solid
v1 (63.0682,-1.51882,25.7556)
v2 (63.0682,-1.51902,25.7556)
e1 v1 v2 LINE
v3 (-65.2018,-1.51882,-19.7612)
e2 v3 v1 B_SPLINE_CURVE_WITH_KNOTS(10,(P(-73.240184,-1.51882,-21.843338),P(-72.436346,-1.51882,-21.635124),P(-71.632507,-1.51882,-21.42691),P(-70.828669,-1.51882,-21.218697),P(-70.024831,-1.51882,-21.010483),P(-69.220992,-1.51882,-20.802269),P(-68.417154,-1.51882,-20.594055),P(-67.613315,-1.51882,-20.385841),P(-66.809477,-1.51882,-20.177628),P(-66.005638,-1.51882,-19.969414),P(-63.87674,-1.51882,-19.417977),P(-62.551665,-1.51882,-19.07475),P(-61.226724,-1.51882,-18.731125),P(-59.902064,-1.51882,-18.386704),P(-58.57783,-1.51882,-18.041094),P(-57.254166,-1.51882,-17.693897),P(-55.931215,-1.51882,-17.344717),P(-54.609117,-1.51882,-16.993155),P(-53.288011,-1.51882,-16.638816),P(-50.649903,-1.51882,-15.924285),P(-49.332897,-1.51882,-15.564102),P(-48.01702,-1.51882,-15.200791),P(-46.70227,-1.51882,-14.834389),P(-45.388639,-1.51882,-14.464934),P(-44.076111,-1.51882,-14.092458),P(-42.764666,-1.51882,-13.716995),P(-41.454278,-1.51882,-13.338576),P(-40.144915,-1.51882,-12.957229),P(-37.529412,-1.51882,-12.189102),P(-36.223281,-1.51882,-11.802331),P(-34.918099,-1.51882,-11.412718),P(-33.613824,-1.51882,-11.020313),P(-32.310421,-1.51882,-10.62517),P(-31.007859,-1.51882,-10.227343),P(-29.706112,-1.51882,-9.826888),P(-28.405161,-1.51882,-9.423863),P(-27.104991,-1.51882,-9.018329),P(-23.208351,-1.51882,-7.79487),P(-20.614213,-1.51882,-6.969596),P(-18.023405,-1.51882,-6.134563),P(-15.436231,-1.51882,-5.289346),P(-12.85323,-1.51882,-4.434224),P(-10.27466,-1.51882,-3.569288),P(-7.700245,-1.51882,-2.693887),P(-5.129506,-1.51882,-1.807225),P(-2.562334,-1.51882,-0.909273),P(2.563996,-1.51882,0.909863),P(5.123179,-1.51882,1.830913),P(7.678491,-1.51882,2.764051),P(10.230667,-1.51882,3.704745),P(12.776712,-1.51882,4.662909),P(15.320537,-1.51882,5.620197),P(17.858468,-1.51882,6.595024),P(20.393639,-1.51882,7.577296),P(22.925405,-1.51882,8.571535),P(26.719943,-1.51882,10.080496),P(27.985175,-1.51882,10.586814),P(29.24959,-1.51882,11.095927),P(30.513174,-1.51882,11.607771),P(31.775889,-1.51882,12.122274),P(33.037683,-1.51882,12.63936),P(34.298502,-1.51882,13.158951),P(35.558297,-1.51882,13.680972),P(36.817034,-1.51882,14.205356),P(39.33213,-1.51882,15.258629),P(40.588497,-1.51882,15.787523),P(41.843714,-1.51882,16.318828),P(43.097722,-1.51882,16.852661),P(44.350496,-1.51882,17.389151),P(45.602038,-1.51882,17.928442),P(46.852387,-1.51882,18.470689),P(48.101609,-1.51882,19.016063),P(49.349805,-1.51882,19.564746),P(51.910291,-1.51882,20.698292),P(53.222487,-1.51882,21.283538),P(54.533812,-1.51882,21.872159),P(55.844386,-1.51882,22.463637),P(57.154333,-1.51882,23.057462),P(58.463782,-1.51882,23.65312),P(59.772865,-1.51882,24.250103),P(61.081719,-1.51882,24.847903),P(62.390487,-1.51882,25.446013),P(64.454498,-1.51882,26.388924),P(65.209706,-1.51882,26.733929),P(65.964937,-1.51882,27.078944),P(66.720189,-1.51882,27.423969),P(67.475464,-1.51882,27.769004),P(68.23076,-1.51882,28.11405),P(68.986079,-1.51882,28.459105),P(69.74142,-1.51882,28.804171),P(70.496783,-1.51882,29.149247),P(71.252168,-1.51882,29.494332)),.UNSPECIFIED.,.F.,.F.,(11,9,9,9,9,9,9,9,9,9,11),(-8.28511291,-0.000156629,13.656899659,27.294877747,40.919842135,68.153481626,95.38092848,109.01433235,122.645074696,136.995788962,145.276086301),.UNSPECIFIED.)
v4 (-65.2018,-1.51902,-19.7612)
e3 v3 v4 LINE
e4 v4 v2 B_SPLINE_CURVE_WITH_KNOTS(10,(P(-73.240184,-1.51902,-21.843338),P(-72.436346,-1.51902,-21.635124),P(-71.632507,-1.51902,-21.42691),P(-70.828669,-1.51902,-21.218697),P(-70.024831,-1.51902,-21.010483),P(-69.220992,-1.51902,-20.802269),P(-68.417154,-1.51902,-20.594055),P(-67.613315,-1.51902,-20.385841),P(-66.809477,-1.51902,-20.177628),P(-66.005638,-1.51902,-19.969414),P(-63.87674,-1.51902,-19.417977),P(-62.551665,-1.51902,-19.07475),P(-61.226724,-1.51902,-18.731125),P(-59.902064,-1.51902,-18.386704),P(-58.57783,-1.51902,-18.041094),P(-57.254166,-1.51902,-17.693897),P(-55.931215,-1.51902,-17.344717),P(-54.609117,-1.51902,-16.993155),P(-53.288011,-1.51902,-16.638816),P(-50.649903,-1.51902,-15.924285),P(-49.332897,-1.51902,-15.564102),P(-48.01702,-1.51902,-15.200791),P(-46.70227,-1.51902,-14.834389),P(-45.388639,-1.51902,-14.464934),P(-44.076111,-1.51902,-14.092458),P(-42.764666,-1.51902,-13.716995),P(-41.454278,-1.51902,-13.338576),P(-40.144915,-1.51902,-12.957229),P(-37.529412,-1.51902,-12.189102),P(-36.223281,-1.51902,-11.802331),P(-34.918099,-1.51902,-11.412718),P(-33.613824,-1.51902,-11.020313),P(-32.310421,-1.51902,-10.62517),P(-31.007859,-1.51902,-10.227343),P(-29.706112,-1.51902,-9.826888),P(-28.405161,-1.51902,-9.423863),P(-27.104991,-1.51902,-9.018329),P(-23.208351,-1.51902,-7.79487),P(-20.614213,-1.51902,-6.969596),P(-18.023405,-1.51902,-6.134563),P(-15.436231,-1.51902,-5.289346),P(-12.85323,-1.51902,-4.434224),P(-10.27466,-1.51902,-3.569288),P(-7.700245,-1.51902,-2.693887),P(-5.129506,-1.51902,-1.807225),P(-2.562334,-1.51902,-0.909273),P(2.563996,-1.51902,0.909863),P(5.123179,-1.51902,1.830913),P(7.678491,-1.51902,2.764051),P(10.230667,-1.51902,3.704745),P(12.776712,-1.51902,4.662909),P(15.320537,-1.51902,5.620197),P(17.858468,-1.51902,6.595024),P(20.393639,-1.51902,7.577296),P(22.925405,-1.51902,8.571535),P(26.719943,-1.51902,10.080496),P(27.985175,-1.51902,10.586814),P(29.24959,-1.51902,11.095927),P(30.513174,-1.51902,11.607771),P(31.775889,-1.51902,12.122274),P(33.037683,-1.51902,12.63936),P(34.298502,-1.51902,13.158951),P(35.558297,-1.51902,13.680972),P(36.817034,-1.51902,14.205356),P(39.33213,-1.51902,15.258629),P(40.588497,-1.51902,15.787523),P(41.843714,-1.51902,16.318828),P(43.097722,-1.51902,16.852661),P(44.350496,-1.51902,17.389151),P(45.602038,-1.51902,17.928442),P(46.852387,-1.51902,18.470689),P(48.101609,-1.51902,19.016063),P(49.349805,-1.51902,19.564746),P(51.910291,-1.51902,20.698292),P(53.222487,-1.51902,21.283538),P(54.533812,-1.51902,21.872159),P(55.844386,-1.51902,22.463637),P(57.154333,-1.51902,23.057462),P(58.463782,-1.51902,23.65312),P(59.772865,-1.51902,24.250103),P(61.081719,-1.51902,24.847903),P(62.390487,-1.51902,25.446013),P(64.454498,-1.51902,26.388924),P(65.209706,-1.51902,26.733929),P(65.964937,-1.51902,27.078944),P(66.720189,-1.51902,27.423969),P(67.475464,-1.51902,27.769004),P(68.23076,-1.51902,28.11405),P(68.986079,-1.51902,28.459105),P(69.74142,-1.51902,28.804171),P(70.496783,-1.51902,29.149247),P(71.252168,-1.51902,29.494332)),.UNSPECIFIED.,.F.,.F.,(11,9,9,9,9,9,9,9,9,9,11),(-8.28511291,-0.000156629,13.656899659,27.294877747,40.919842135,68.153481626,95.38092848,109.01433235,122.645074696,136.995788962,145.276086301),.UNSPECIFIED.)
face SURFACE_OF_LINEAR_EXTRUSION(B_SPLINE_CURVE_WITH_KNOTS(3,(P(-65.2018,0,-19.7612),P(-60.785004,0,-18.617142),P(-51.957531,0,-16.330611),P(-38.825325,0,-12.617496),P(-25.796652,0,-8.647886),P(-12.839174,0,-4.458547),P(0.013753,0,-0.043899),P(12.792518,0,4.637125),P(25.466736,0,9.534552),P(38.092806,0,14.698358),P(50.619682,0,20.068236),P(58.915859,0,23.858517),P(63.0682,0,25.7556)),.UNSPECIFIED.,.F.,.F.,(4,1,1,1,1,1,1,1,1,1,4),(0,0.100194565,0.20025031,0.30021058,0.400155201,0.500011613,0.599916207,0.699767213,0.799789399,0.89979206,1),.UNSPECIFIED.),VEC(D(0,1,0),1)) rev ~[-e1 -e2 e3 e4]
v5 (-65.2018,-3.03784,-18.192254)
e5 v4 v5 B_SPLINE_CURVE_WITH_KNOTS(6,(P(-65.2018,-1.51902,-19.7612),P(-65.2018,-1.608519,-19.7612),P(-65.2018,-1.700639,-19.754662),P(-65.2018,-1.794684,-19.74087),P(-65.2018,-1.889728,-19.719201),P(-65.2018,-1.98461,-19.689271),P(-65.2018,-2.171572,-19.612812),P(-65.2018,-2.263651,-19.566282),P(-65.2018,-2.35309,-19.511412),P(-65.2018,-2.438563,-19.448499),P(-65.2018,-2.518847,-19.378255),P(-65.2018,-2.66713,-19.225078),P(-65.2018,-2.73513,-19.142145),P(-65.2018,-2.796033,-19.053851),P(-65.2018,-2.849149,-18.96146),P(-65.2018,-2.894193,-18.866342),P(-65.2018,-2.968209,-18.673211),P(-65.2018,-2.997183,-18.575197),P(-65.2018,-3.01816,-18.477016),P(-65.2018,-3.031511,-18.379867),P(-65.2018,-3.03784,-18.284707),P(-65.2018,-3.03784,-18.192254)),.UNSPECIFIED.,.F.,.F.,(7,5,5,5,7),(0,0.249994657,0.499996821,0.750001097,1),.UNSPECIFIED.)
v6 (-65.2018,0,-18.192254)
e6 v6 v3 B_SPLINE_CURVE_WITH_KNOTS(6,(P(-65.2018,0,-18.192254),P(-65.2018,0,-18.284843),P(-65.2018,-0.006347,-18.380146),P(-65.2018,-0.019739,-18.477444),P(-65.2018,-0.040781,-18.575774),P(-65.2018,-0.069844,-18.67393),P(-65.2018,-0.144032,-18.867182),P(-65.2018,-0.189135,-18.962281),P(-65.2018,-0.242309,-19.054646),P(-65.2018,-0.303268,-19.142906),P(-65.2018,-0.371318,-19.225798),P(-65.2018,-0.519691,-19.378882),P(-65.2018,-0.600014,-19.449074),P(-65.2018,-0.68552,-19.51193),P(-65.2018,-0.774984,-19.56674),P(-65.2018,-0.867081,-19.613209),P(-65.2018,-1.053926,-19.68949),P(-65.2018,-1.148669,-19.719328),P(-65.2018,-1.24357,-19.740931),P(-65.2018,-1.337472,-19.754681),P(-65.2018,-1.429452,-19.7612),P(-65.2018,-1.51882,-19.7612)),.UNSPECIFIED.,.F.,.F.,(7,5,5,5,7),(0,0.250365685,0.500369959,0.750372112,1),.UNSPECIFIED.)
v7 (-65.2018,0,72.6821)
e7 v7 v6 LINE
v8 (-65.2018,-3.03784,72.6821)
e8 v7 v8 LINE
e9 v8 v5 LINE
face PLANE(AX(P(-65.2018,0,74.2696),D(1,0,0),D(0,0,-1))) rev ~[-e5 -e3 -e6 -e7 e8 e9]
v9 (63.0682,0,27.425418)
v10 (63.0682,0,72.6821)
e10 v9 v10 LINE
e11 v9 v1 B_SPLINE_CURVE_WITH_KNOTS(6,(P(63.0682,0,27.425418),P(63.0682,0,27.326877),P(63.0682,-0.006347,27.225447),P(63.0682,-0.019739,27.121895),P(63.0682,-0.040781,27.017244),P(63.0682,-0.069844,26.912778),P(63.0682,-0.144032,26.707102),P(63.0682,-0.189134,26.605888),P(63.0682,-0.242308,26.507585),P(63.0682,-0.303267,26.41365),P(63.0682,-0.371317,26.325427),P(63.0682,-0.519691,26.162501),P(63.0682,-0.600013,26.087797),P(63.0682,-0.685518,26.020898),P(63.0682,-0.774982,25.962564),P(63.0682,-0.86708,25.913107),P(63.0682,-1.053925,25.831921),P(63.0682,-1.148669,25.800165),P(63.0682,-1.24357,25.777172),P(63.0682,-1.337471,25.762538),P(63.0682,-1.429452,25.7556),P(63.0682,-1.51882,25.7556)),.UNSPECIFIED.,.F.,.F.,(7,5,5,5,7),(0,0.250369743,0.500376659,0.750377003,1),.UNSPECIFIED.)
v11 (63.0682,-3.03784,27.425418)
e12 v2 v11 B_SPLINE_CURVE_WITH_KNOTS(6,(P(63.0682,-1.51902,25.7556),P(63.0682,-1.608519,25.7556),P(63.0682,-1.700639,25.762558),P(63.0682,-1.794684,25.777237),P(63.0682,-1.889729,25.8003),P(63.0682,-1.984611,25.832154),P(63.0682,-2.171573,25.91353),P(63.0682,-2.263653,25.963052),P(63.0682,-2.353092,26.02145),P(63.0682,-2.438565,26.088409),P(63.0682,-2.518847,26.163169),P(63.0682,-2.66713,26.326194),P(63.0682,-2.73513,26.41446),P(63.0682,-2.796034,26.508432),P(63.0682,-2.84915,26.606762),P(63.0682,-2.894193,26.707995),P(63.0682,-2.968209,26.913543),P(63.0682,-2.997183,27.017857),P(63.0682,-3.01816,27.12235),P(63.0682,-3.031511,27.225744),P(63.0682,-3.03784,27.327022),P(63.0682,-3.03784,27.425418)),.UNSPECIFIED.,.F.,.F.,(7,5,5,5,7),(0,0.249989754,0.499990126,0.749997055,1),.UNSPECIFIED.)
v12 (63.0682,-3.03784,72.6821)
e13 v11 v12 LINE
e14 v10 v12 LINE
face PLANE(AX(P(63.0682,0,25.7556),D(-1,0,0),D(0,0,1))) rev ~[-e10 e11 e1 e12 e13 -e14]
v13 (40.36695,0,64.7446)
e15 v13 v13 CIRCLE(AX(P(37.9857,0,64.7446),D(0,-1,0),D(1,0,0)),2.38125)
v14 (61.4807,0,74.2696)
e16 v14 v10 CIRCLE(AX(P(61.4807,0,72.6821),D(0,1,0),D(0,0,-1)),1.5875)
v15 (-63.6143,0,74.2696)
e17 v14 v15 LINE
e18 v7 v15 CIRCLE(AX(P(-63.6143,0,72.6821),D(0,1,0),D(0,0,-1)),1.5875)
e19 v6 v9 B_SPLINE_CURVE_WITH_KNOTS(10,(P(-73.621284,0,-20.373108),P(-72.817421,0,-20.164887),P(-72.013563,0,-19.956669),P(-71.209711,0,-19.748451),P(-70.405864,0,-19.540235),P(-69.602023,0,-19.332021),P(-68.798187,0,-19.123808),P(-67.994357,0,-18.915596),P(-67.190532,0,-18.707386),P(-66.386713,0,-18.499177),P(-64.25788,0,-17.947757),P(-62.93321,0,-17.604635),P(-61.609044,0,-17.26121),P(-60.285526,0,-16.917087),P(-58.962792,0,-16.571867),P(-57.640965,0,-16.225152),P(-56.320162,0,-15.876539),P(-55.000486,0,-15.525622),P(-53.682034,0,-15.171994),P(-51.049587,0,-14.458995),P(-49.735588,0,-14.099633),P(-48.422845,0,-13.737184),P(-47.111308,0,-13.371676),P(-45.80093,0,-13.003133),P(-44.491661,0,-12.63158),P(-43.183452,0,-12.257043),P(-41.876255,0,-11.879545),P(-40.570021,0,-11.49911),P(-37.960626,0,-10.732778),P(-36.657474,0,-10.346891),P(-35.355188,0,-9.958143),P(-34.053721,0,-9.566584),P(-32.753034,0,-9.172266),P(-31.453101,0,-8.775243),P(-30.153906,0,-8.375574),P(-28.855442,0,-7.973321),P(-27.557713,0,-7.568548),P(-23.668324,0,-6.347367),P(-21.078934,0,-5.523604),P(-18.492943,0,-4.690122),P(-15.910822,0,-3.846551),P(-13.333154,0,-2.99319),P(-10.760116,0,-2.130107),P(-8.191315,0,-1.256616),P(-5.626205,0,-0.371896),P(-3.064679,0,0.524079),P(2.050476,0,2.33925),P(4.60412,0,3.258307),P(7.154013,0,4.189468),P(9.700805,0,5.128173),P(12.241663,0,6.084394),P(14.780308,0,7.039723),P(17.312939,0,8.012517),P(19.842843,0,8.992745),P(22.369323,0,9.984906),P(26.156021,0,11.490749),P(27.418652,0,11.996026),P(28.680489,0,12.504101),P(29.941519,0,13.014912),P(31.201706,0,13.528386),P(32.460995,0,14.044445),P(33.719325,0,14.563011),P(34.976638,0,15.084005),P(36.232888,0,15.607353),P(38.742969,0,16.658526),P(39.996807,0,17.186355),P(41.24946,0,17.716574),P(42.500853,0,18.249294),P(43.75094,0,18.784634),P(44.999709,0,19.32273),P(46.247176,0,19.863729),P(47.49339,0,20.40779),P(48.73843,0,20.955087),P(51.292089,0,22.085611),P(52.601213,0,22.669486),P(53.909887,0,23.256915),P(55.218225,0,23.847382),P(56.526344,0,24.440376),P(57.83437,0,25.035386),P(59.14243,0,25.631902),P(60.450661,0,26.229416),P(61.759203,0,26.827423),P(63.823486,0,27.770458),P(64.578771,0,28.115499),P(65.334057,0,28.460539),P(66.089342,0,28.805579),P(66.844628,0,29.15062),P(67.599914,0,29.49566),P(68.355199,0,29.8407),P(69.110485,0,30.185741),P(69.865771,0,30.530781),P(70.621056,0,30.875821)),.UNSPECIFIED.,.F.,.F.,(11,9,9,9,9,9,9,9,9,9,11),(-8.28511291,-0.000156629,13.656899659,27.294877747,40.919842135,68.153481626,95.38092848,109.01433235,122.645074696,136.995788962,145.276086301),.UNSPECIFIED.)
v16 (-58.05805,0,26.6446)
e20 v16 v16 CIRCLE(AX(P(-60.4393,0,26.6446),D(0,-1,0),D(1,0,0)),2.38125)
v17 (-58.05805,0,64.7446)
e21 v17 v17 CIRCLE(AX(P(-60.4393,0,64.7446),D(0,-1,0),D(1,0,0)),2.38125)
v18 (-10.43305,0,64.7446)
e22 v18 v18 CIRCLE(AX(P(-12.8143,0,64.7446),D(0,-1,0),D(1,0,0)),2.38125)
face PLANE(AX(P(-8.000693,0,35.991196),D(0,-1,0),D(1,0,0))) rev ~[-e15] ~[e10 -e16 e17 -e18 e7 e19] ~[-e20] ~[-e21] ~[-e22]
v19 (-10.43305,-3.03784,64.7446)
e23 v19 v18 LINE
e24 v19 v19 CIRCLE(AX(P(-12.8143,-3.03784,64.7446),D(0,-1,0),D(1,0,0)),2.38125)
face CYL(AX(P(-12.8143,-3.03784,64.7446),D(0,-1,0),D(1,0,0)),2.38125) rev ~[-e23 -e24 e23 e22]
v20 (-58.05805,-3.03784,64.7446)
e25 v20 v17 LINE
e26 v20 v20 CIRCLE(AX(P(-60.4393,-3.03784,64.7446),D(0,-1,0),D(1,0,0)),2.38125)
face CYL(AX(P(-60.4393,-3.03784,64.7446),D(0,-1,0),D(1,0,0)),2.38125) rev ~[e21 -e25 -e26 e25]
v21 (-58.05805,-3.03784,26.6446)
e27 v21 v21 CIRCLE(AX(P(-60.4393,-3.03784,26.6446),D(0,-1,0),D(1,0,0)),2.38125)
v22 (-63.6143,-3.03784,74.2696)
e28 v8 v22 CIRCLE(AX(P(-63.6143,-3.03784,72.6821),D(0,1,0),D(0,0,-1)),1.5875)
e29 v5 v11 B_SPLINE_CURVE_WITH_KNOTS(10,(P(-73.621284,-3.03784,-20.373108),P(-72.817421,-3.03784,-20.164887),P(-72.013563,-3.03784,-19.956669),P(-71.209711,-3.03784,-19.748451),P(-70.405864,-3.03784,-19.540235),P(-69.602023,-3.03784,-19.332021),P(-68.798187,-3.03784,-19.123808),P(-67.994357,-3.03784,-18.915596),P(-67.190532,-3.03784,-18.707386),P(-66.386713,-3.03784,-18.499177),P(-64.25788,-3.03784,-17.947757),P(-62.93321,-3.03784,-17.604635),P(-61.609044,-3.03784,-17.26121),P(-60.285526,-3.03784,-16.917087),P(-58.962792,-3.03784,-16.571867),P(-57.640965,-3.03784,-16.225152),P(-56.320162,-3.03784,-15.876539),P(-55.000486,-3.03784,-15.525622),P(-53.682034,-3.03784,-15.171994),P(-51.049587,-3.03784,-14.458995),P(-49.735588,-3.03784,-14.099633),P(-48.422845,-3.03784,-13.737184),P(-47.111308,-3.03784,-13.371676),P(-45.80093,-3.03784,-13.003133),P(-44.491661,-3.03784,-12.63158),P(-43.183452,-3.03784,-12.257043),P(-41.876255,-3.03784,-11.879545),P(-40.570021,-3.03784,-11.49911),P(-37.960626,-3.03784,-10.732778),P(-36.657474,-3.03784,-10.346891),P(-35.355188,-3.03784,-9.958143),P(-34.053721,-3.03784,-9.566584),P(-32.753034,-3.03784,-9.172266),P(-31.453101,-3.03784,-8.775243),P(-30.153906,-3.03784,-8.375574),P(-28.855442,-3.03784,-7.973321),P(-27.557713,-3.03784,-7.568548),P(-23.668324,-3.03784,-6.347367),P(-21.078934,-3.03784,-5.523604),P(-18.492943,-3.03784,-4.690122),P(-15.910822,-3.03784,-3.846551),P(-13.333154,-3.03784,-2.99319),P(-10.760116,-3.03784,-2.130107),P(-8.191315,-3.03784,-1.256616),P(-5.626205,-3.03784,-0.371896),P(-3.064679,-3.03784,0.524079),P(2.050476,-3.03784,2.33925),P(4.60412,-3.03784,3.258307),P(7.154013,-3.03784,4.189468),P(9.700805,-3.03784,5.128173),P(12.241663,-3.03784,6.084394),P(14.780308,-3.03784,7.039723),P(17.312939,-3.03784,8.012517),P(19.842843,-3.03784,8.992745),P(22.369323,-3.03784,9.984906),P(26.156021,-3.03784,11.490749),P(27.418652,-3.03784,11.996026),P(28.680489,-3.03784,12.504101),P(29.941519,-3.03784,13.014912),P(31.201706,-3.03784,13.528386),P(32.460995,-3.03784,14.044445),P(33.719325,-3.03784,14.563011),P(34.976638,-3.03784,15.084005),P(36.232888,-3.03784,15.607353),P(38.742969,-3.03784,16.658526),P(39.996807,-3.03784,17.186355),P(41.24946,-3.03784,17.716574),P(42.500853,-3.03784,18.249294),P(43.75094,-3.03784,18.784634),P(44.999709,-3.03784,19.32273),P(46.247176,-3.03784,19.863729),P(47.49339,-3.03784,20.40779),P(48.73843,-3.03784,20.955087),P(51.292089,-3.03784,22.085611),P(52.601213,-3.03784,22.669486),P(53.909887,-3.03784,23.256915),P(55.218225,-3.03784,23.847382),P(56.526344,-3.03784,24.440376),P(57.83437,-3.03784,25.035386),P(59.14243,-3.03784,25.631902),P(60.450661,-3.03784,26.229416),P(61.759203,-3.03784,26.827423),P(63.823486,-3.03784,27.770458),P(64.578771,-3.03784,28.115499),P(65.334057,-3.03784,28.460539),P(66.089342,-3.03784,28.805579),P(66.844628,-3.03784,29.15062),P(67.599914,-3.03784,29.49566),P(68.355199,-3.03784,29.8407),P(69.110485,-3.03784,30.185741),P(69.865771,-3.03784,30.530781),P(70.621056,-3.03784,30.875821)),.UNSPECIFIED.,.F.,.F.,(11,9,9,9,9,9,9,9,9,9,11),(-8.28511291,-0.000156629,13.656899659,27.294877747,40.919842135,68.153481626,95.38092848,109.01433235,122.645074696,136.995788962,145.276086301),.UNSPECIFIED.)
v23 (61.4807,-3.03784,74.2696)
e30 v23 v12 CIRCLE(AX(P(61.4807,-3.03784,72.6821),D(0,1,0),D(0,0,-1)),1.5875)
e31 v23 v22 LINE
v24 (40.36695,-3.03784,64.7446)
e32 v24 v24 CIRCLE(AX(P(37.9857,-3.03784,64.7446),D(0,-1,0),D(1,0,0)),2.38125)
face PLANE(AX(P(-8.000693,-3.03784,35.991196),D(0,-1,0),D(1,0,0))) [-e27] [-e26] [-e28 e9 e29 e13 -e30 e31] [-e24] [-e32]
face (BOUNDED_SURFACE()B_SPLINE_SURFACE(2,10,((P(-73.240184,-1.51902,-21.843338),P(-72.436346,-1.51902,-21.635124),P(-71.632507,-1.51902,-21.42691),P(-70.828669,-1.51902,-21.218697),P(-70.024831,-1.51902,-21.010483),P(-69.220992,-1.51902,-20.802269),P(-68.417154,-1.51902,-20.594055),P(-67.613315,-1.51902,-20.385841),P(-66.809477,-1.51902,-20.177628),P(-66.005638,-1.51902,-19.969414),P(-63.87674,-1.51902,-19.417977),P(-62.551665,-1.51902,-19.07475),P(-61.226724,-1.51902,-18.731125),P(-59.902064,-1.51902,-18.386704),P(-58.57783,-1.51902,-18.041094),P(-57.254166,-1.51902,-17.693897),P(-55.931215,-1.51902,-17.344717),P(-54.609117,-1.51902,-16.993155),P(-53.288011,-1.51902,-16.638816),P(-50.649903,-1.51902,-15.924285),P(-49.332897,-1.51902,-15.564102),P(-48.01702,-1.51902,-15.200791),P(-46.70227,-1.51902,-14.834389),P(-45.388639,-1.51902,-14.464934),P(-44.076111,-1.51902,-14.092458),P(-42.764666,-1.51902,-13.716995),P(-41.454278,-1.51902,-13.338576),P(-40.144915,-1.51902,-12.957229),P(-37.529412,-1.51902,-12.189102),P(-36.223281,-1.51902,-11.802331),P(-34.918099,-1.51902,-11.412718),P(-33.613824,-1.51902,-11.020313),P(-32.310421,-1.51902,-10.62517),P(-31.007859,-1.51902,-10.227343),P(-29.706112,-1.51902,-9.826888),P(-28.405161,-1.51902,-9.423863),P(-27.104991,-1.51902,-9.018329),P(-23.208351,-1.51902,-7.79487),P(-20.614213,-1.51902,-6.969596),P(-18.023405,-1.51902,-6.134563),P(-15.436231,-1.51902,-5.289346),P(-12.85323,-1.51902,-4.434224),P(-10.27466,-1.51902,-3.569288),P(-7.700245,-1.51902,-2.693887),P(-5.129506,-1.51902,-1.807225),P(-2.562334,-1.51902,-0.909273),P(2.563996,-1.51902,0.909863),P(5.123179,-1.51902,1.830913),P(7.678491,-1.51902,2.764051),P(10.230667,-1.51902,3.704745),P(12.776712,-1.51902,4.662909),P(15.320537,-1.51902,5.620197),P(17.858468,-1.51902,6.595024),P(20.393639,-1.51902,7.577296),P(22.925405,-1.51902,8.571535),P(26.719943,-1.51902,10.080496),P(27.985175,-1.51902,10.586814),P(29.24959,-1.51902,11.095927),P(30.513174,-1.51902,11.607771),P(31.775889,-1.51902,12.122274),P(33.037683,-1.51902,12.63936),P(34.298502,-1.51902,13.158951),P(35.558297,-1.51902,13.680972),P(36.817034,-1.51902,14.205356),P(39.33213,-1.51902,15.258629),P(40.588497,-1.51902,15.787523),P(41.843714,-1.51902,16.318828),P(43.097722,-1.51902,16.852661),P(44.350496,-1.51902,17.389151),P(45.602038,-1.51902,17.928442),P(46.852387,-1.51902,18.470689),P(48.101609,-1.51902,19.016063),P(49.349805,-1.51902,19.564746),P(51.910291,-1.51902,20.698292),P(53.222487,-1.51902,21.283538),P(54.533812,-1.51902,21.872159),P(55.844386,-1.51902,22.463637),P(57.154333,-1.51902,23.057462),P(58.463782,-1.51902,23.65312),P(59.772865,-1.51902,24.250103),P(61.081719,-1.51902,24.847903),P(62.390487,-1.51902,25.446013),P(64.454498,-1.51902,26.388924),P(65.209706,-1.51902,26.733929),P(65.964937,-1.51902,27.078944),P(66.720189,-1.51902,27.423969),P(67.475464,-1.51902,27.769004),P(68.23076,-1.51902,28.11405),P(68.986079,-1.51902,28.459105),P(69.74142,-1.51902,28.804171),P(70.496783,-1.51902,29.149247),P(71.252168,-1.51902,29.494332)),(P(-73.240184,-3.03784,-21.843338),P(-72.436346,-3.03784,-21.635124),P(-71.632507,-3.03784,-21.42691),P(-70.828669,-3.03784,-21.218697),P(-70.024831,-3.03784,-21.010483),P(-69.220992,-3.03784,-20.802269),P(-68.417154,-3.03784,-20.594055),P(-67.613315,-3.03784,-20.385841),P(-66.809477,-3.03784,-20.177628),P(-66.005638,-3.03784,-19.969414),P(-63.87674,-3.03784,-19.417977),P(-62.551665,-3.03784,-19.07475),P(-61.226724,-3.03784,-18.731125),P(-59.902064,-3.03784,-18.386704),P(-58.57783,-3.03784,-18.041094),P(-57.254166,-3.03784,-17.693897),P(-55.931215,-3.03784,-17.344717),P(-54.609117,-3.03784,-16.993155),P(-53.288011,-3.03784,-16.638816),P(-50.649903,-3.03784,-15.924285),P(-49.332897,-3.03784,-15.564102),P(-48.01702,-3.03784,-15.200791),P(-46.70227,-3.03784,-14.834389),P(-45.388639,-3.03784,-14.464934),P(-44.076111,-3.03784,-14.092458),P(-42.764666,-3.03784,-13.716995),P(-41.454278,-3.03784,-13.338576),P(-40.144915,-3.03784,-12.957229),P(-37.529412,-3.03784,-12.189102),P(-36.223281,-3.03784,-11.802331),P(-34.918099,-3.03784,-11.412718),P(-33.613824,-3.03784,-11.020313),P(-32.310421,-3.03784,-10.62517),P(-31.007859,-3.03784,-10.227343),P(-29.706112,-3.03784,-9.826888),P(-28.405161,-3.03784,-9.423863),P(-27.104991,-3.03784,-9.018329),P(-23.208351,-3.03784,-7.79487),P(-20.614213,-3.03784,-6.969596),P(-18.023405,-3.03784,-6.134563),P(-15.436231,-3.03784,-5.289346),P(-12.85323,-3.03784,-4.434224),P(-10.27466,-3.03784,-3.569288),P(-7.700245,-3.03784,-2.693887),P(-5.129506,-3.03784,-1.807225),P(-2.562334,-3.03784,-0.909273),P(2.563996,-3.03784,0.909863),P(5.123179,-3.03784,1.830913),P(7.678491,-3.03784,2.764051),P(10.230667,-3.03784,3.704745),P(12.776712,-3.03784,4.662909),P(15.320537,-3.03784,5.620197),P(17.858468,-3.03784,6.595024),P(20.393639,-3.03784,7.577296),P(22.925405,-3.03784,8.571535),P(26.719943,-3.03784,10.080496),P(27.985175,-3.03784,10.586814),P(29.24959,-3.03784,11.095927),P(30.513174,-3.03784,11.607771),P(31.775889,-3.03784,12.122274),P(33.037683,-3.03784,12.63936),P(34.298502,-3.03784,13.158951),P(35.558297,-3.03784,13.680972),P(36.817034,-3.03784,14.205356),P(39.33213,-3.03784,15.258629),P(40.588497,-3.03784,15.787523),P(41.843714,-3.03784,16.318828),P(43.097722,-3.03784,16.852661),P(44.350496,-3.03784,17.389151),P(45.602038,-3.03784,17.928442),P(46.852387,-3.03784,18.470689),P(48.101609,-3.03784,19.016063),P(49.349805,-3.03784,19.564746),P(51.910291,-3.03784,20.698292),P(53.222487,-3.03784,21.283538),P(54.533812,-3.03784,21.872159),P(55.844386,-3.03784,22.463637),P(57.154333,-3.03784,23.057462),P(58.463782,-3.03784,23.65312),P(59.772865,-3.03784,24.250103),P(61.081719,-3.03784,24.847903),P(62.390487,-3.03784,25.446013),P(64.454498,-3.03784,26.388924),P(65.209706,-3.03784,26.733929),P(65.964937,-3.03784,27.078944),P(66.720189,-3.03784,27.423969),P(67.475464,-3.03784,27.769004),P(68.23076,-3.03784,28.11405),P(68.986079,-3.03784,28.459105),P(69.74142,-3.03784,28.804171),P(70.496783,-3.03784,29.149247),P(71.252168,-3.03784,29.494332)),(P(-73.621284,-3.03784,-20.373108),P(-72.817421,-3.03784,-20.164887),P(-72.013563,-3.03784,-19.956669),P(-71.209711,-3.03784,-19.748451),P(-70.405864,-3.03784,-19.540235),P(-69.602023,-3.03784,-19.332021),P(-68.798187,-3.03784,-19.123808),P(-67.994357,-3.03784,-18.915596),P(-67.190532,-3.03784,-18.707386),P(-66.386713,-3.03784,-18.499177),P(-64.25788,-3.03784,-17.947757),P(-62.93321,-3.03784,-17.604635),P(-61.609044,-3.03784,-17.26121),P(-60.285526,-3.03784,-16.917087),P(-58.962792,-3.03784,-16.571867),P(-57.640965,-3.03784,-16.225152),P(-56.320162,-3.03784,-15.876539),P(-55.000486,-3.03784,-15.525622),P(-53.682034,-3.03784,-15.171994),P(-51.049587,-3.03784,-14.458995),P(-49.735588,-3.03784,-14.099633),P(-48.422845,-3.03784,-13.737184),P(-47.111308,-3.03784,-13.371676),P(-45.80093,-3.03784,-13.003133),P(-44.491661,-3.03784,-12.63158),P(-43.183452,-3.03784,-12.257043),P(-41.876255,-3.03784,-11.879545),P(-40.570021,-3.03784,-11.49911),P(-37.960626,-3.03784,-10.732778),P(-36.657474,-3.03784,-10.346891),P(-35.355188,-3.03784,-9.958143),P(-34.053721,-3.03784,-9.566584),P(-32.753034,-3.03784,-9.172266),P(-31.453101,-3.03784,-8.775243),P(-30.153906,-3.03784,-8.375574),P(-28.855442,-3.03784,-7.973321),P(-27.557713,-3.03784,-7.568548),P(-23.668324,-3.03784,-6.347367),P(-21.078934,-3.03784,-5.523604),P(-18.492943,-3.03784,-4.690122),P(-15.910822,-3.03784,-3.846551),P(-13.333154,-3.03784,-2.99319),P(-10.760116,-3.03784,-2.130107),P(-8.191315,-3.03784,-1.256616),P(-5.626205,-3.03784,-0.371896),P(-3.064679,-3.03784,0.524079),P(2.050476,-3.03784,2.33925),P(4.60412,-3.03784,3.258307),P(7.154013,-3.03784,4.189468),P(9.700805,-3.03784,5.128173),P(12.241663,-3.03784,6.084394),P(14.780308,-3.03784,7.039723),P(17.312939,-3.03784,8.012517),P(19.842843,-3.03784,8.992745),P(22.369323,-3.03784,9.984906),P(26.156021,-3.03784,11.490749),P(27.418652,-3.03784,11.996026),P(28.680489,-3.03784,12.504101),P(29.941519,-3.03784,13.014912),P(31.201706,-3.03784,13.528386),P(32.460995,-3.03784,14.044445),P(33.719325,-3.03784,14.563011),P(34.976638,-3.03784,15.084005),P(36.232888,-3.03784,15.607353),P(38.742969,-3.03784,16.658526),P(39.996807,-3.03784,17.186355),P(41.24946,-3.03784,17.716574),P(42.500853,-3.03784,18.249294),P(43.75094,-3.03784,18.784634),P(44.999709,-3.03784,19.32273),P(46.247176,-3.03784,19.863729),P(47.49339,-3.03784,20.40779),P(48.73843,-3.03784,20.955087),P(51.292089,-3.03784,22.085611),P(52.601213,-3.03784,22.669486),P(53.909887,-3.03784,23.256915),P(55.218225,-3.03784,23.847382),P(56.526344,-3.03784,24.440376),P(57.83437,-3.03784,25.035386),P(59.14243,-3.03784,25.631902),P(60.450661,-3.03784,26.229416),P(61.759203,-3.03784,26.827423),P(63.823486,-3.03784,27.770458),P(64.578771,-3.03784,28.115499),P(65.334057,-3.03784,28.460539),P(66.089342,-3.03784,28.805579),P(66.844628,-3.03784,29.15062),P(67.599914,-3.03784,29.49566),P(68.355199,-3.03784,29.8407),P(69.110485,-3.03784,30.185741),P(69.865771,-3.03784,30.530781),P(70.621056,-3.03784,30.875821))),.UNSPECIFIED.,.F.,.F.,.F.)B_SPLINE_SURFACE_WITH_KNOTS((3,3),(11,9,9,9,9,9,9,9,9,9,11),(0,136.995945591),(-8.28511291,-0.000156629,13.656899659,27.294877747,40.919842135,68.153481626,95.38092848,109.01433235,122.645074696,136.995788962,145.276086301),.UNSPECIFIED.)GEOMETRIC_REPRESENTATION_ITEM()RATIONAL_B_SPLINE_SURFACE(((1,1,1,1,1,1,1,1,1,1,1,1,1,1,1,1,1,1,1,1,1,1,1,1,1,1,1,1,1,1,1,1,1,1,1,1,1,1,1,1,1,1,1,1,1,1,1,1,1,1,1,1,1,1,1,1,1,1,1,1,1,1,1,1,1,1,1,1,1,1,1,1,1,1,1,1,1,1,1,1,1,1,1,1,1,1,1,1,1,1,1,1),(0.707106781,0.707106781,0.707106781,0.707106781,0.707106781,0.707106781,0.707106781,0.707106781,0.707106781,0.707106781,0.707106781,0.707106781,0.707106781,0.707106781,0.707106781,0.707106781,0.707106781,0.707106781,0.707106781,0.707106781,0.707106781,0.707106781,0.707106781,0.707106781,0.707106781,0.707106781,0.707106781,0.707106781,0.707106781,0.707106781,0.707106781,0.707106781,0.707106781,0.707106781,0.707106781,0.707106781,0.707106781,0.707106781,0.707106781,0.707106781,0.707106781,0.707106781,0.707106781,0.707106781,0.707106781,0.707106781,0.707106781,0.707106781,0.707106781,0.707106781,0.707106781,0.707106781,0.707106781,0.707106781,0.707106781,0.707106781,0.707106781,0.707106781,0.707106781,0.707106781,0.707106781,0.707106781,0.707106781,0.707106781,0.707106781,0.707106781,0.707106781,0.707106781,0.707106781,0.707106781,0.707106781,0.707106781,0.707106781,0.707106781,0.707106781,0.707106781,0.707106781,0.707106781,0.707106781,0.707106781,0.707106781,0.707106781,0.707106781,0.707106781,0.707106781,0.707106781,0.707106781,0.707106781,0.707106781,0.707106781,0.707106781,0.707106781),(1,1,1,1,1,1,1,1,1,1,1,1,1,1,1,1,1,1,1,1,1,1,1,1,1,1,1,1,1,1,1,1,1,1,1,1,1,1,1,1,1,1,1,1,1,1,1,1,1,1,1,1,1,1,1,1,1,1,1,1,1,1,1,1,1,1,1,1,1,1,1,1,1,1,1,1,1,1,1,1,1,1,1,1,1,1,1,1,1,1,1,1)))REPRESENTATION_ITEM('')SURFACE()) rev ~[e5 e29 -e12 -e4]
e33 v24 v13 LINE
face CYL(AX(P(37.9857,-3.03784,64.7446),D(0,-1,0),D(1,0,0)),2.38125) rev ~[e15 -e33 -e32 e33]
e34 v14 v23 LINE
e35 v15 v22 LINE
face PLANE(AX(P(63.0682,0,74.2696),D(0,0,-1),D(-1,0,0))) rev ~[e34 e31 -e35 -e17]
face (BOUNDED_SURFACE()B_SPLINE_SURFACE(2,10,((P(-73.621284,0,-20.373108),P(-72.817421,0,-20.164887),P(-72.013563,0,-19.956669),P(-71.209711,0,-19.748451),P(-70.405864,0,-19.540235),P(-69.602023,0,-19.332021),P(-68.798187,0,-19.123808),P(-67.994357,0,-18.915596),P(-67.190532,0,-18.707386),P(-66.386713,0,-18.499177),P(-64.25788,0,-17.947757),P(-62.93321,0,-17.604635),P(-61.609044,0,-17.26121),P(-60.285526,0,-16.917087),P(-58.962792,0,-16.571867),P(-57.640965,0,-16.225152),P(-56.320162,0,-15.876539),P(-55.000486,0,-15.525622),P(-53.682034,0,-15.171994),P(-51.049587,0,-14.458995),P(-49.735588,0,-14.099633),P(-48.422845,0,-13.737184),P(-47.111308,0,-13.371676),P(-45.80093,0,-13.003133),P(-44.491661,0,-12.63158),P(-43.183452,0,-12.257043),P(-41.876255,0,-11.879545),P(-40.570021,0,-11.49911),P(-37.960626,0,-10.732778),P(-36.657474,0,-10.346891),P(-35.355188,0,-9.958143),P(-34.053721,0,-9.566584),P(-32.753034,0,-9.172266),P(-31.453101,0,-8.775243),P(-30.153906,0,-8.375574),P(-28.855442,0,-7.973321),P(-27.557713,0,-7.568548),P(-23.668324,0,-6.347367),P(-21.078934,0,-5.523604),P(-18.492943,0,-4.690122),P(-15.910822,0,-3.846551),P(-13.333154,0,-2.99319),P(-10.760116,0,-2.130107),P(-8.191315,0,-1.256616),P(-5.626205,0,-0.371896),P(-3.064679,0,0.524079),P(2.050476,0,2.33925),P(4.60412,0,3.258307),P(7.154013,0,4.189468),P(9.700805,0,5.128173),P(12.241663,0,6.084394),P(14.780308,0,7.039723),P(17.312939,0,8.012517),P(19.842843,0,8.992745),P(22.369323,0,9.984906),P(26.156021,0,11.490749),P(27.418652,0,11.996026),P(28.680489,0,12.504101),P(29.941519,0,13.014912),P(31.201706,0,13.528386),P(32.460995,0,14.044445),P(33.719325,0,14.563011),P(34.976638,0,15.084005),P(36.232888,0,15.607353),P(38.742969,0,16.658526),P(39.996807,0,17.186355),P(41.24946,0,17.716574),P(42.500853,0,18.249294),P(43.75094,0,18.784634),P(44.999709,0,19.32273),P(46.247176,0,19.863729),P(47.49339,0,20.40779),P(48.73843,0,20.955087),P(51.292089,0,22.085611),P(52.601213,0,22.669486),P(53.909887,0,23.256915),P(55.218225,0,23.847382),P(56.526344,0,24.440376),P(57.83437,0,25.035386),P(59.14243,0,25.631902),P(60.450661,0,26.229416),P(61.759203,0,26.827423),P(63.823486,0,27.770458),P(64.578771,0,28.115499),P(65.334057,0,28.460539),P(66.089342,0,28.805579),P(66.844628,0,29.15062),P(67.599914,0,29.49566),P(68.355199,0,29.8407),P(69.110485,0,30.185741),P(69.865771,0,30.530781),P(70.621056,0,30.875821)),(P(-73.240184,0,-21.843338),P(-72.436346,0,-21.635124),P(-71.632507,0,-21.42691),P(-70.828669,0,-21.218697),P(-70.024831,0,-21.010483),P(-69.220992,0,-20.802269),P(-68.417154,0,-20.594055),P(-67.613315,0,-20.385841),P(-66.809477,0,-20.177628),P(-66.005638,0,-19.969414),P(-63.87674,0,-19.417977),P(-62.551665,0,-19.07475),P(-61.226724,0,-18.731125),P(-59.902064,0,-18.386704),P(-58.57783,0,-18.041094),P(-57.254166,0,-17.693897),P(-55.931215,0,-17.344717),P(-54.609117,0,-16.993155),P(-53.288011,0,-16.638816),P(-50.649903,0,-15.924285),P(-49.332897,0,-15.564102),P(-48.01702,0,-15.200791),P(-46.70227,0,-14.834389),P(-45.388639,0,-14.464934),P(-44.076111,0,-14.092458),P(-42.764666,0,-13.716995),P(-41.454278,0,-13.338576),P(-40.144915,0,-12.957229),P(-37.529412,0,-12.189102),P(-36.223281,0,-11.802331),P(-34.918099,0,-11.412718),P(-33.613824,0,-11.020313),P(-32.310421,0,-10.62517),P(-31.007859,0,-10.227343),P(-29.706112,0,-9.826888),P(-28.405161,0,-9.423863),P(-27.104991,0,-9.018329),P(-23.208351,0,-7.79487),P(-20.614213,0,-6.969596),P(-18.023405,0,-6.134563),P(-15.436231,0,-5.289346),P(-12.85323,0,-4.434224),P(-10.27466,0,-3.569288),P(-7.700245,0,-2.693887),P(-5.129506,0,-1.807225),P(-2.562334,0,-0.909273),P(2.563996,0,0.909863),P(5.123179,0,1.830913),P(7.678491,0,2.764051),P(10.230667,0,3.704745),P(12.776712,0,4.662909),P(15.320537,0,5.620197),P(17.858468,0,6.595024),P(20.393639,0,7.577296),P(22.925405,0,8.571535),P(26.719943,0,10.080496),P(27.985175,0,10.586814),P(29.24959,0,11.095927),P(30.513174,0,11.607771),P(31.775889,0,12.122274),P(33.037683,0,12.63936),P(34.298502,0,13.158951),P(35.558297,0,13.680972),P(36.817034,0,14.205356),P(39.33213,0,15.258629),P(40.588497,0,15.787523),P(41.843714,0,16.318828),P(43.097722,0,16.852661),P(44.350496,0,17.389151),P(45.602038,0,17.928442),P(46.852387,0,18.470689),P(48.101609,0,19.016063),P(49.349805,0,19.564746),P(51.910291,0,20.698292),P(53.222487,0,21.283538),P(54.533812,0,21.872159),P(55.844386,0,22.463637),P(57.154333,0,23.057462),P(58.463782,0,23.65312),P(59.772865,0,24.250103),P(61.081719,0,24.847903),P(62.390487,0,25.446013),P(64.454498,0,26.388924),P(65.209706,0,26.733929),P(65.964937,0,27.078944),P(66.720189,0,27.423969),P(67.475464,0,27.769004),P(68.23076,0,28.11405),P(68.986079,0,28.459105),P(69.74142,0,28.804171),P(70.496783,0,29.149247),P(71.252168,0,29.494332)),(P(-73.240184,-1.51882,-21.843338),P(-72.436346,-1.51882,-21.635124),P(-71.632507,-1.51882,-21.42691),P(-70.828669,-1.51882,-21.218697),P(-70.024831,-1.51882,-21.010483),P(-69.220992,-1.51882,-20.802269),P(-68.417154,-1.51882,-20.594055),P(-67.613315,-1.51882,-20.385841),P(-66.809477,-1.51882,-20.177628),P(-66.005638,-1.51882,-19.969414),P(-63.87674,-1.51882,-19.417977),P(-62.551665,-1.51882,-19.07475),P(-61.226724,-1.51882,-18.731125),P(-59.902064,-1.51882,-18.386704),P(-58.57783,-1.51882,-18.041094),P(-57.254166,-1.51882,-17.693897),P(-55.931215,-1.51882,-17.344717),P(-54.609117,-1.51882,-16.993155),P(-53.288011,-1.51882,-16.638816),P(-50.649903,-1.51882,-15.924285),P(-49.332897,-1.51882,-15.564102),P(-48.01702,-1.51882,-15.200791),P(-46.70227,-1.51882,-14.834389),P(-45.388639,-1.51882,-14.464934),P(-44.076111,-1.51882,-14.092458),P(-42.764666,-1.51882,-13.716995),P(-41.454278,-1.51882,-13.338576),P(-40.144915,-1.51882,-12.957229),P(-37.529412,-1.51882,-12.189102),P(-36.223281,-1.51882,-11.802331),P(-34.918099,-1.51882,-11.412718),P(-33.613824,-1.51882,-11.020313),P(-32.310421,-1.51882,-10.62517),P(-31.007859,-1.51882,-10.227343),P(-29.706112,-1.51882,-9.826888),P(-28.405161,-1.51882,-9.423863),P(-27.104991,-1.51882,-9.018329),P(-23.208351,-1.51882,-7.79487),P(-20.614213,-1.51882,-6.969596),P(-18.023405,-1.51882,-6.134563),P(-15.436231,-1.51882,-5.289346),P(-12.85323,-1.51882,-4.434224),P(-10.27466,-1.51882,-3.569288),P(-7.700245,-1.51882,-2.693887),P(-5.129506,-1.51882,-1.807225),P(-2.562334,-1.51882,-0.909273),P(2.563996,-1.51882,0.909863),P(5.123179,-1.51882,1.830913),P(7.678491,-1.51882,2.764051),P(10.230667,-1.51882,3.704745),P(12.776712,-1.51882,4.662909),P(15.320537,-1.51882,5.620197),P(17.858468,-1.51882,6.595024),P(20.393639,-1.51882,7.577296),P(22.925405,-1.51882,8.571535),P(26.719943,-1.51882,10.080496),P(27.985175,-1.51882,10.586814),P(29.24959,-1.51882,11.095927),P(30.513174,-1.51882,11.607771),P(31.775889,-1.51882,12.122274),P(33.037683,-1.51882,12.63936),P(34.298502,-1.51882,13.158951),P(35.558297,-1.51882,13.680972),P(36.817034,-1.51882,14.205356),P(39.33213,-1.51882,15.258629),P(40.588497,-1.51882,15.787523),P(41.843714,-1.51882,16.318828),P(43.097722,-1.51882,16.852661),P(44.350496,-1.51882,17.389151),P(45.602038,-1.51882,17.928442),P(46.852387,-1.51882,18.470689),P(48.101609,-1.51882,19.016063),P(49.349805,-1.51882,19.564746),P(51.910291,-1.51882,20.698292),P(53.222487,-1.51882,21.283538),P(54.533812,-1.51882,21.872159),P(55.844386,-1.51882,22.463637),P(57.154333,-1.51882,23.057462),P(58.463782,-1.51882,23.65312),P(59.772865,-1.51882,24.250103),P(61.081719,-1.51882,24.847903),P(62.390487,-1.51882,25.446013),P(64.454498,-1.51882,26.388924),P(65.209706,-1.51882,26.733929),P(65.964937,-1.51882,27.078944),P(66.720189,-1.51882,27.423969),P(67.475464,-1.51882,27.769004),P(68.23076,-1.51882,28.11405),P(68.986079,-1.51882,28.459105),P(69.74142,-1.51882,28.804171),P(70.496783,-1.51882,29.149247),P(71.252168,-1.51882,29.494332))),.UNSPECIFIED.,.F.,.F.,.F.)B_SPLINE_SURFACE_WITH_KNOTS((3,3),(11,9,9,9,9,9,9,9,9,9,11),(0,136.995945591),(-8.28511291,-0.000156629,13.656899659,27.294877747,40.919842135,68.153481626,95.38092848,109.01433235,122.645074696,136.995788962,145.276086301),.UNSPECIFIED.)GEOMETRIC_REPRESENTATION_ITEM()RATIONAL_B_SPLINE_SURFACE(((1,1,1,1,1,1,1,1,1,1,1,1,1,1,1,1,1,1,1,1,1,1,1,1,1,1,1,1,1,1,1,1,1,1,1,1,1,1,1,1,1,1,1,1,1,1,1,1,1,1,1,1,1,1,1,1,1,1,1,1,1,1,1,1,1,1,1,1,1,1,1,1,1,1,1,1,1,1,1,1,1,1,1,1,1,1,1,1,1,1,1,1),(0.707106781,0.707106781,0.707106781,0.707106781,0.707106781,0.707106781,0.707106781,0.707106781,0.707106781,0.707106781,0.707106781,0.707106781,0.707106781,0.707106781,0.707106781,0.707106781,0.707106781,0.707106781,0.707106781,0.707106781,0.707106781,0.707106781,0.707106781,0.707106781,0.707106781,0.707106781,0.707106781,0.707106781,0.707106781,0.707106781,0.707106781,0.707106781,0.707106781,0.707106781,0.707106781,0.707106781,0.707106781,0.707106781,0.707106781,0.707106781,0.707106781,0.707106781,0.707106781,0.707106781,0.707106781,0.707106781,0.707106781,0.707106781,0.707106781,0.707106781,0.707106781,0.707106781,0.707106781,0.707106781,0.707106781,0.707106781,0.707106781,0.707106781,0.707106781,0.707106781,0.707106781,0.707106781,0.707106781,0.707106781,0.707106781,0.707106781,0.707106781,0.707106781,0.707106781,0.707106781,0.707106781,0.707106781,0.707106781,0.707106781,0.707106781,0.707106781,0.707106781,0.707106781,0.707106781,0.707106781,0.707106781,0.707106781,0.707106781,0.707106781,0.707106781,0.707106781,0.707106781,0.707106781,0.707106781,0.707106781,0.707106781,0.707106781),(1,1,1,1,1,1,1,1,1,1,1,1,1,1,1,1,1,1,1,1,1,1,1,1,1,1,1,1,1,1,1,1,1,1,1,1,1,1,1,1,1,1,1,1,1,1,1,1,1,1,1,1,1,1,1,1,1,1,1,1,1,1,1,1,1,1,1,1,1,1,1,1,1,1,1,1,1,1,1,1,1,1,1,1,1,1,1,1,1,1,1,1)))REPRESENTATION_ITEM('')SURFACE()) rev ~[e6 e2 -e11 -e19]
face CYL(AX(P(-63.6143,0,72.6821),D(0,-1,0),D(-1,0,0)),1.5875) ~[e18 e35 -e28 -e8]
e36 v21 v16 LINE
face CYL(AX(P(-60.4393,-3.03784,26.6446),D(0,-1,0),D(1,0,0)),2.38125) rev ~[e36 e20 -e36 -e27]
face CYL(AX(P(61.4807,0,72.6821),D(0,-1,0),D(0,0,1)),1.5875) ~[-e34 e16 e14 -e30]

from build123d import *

# Parameters (mm, degrees)
F1_DEPTH = 3.03784
F2_R     = 2.38125
F3_DEPTH = 3.03784
F4_R     = 1.5875
F5_R     = 1.51882


# Not quite as in the source:
# - a fillet or chamfer is up to 0.001 mm smaller than in the source, because OpenCascade refuses the exact size


with BuildPart() as f1:
    # F0 (on Front) → F1 (new body)
    with BuildSketch(Plane.XZ):
        with BuildLine():
            Line((-65.2018, 74.2696), (-65.2018, -19.7612))
            add(Edge.make_bspline(
                [(-65.2018, -19.7612), (-60.7850037253, -18.6171418479), (-51.9575306305, -16.3306106319), (-38.8253253798, -12.61749568), (-25.7966517502, -8.6478861048), (-12.8391741047, -4.4585465011), (0.0137529583, -0.0438991729), (12.7925184797, 4.6371253852), (25.4667360287, 9.5345524455), (38.0928063194, 14.6983578431), (50.6196821862, 20.0682362577), (58.915858645, 23.8585166667), (63.0682, 25.7556)],
                knots=[0, 0, 0, 0, 0.1001945647, 0.2002503103, 0.3002105802, 0.4001552007, 0.5000116128, 0.5999162071, 0.6997672128, 0.7997893994, 0.8997920596, 1, 1, 1, 1], degree=3))
            Line((63.0682, 25.7556), (63.0682, 74.2696))
            Line((63.0682, 74.2696), (-65.2018, 74.2696))
        make_face()
    extrude(amount=F1_DEPTH)

    # F2 (on face) → F3 (cut, through all)
    with BuildSketch(Plane.XZ.offset(3.03784)):
        with Locations((-60.4393, 64.7446)):
            Circle(F2_R)
        with Locations((-60.4393, 26.6446)):
            Circle(F2_R)
        with Locations((-12.8143, 64.7446)):
            Circle(F2_R)
        with Locations((37.9857, 64.7446)):
            Circle(F2_R)
    extrude(amount=-F3_DEPTH, mode=Mode.SUBTRACT)

    # F4
    f4_edges = [f1.edges().sort_by_distance(p)[0] for p in [
        (-65.2018, -1.51892, 74.2696),
        (63.0682, -1.51892, 74.2696),
    ]]
    fillet(f4_edges, radius=F4_R)

    # F5 (radius 1.51892 in the source; OpenCascade refuses exactly that, so slightly less here)
    f5_edges = [f1.edges().sort_by_distance(p)[0] for p in [
        (-0.002981, -3.03784, -0.001058),
        (-0.002981, 0, -0.001058),
    ]]
    fillet(f5_edges, radius=F5_R)


solid = f1.part
